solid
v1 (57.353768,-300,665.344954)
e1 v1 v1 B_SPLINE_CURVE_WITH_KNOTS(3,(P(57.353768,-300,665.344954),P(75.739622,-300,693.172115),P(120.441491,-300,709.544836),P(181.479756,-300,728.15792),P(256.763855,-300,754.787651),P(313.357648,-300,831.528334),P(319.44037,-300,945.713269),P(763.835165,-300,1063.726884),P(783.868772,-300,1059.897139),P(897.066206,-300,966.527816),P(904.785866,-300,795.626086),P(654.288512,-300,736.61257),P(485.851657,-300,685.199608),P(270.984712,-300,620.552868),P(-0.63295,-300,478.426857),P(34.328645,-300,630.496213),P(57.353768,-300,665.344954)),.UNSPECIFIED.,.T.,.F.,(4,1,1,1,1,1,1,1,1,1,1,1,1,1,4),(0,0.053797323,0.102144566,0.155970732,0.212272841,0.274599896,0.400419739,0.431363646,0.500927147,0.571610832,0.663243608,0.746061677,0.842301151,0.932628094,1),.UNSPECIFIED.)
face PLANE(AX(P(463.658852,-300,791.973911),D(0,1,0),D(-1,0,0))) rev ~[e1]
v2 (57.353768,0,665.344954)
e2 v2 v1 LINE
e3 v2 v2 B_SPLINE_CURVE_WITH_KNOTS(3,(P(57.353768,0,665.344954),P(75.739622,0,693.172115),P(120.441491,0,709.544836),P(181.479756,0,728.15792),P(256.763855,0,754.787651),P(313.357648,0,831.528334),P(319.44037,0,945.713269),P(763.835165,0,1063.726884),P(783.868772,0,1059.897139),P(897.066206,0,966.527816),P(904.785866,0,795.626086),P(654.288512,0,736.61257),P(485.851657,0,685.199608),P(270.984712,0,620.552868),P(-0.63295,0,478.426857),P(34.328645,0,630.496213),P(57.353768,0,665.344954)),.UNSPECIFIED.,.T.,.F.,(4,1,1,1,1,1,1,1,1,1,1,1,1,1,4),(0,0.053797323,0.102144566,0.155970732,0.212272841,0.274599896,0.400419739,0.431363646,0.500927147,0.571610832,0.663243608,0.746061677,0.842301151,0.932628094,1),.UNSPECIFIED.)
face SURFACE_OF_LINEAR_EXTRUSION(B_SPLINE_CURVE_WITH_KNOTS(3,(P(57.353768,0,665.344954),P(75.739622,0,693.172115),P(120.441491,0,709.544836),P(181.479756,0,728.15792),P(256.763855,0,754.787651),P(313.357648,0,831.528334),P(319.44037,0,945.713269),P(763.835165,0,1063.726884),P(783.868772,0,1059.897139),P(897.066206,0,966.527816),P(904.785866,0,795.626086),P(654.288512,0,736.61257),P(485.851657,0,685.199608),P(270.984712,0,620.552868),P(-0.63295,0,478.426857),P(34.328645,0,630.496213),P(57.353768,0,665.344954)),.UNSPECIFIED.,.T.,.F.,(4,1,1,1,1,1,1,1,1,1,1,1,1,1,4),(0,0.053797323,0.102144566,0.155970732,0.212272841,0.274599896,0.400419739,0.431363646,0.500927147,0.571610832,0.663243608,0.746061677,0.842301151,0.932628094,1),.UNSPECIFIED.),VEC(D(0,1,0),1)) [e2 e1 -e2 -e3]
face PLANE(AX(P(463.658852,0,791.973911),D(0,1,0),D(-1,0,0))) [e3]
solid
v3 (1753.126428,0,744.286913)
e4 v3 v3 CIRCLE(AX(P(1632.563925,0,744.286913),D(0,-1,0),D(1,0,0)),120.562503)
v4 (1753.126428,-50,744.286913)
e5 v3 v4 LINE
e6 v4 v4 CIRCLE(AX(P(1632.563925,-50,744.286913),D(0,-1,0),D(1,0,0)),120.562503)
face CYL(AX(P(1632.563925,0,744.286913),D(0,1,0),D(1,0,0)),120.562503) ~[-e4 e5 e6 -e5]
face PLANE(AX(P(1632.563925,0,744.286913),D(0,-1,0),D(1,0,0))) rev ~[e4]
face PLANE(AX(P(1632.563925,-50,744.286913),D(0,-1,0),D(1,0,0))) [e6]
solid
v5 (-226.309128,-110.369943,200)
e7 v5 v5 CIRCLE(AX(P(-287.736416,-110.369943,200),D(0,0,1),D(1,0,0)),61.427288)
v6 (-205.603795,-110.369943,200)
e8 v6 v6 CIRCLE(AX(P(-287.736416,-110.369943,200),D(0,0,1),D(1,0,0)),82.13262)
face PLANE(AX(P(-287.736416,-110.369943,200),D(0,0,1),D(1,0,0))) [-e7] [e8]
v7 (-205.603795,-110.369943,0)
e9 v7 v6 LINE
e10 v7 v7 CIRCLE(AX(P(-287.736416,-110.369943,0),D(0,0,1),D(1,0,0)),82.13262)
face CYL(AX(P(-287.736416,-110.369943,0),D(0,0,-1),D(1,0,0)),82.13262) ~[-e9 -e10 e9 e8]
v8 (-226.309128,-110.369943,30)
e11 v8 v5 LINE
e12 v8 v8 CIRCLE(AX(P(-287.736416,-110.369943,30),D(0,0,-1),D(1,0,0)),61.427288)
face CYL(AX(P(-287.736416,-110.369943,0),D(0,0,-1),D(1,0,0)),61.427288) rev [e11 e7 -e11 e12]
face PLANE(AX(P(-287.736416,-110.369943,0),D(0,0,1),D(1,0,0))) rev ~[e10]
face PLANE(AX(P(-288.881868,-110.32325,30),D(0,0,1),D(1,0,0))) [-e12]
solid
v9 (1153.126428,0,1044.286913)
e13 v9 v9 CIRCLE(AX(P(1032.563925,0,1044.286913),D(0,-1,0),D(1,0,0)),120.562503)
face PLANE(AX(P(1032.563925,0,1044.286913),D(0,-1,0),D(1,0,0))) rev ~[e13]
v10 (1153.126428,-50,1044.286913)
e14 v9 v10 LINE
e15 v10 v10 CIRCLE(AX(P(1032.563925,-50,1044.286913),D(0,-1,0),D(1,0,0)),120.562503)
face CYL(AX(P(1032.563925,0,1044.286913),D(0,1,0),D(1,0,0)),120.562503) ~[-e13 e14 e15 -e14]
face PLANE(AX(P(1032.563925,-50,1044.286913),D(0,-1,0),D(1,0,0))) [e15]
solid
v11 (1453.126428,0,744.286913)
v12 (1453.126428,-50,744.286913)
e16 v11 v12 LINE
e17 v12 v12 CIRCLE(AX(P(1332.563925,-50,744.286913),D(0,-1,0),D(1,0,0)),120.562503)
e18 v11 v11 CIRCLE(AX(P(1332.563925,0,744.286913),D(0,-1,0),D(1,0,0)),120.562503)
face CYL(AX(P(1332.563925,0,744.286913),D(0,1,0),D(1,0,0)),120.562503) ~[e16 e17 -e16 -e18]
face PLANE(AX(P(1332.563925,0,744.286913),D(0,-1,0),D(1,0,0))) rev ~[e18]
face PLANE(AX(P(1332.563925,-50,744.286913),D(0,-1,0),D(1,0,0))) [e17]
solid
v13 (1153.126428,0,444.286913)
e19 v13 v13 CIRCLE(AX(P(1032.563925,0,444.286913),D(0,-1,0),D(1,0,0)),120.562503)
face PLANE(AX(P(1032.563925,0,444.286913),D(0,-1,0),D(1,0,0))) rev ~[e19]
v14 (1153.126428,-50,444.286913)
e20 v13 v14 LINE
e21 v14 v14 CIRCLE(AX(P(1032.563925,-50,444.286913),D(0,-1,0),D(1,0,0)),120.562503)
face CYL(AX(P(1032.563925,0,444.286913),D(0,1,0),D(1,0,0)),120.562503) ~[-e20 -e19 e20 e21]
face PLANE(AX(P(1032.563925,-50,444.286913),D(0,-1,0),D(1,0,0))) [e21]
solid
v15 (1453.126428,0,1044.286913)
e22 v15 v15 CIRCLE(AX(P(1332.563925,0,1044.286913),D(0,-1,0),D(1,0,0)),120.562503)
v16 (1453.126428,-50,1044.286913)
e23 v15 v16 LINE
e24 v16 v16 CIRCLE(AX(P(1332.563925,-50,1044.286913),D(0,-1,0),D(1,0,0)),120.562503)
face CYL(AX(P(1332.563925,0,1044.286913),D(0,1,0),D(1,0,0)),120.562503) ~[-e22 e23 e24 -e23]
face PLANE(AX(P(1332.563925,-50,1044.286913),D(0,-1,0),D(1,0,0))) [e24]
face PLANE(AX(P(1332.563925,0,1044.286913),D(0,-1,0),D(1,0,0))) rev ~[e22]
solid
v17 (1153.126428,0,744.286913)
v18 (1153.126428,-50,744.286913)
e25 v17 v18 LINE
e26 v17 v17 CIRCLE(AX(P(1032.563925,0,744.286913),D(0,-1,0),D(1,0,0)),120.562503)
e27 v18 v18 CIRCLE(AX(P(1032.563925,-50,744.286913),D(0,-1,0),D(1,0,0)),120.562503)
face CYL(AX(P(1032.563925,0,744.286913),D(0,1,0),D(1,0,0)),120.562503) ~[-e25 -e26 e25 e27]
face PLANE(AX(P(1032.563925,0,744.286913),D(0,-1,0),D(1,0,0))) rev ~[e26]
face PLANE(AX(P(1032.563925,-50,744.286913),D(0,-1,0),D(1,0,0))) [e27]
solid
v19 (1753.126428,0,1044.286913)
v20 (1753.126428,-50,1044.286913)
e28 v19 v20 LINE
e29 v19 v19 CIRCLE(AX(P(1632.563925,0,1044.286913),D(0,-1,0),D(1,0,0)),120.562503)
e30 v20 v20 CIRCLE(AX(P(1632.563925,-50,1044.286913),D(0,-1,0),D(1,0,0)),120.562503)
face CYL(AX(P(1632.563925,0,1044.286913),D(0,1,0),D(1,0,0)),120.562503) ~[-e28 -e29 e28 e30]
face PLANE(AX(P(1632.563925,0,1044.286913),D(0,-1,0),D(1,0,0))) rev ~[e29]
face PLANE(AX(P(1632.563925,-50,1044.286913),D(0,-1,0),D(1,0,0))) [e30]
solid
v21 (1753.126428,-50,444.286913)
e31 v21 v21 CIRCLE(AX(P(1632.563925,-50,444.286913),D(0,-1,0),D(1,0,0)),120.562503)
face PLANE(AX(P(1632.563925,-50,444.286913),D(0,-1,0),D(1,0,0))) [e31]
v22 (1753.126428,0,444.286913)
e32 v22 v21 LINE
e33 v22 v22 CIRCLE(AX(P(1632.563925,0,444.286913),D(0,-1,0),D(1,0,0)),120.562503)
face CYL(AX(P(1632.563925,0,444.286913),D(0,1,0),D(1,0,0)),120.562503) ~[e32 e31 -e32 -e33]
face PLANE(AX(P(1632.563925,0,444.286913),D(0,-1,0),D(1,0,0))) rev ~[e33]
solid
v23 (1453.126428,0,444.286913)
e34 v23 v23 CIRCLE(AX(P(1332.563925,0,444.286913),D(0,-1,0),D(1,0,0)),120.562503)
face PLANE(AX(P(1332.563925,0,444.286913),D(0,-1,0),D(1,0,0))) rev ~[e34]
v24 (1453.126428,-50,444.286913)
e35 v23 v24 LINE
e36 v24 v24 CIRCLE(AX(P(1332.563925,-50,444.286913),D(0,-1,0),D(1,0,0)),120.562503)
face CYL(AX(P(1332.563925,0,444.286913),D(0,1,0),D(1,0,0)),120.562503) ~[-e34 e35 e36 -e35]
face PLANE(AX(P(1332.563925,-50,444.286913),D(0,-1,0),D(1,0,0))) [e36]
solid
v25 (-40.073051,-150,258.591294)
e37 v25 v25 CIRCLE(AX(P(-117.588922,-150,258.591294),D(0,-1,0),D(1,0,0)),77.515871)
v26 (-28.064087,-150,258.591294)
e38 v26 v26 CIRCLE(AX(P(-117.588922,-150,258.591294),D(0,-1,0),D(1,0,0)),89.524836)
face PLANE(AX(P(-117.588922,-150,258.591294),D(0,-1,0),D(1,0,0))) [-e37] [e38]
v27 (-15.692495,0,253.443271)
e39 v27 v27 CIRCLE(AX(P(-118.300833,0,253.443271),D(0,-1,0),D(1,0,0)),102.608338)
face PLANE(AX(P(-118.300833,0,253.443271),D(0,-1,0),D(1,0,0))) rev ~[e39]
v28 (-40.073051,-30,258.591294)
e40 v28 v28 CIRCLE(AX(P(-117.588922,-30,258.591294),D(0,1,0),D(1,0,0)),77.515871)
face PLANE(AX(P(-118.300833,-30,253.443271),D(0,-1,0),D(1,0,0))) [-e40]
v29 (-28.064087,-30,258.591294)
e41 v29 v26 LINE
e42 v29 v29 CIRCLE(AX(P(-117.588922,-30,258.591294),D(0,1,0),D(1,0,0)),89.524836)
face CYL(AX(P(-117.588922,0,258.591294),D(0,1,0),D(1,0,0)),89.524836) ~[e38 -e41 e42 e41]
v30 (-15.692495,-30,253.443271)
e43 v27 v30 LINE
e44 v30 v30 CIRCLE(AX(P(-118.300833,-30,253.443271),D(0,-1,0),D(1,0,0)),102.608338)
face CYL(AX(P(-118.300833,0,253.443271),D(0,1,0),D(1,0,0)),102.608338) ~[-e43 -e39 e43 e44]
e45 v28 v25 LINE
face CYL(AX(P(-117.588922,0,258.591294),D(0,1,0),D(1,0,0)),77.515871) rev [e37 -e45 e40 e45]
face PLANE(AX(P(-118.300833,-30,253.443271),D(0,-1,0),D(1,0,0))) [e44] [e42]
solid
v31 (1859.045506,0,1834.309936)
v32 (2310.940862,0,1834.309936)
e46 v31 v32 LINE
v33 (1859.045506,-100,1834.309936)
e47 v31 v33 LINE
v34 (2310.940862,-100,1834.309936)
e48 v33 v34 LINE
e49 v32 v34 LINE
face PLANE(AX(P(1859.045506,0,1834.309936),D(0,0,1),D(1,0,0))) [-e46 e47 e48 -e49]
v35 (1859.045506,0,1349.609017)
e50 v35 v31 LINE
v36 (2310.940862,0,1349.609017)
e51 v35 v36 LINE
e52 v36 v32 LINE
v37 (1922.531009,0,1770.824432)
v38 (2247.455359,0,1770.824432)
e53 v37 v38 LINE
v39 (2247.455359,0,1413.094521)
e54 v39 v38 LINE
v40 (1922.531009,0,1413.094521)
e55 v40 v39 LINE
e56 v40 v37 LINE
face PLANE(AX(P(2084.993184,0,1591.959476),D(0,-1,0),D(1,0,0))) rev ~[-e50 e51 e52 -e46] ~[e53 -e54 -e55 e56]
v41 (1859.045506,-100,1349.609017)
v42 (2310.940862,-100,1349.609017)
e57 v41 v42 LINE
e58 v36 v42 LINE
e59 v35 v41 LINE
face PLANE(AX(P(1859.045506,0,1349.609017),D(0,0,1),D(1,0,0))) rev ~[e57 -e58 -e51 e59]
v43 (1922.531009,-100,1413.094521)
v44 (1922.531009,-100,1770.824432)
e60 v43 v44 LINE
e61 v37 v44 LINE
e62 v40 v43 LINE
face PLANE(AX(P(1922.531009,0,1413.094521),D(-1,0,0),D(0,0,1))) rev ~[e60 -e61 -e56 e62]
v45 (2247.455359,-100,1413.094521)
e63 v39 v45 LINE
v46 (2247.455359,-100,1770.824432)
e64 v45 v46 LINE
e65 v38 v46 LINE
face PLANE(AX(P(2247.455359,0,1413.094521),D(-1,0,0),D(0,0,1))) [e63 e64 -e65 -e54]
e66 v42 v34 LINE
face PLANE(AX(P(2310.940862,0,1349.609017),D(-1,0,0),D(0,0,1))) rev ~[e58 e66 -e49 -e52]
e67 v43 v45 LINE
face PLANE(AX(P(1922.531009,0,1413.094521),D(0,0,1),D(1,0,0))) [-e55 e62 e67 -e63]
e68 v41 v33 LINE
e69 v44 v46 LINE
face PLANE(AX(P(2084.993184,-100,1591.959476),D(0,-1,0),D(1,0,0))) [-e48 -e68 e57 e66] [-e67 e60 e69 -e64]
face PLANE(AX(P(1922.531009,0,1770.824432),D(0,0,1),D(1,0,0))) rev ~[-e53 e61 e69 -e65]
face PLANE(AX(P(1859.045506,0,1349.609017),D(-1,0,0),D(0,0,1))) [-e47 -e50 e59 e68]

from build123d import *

# Parameters (mm, degrees)
F0_R      = 82.1326203769
F0_R_2    = 61.4272879331
F1_DEPTH  = 200
F2_R      = 71.5377696559
F3_DEPTH  = 30
F4_R      = 89.524835576
F4_R_2    = 77.5158713494
F5_DEPTH  = 150
F6_R      = 102.6083377999
F7_DEPTH  = 30
F9_DEPTH  = 300
F10_R     = 120.562503411
F11_DEPTH = 50
F12_W     = 451.8953561783
F12_H     = 484.7009181976
F12_W_2   = 324.9243497849
F12_H_2   = 357.7299118042
F13_DEPTH = 100


with BuildPart() as f1:
    # F0 (on Top) → F1 (new body)
    with BuildSketch(Plane.XY):
        with Locations((-287.736415863, -110.3699430823)):
            Circle(F0_R)
        with Locations((-287.736415863, -110.3699430823)):
            Circle(F0_R_2, mode=Mode.SUBTRACT)
    extrude(amount=F1_DEPTH)

    # F2 (on Top) → F3 (join)
    with BuildSketch(Plane.XY):
        with Locations((-288.881868124, -110.3232502937)):
            Circle(F2_R)
    extrude(amount=F3_DEPTH)


with BuildPart() as f5:
    # F4 (on Front) → F5 (new body)
    with BuildSketch(Plane.XZ):
        with Locations((-117.5889223814, 258.5912942886)):
            Circle(F4_R)
        with Locations((-117.5889223814, 258.5912942886)):
            Circle(F4_R_2, mode=Mode.SUBTRACT)
    extrude(amount=F5_DEPTH)

    # F6 (on Front) → F7 (join)
    with BuildSketch(Plane.XZ):
        with Locations((-118.300832808, 253.4432709217)):
            Circle(F6_R)
    extrude(amount=F7_DEPTH)


with BuildPart() as f9:
    # F8 (on Front) → F9 (new body)
    with BuildSketch(Plane.XZ):
        with BuildLine():
            add(Edge.make_bspline(
                [(57.3537684977, 665.344953537), (75.7396222507, 693.1721150366), (120.441491181, 709.5448357572), (181.4797555431, 728.1579200138), (256.7638546749, 754.7876508309), (313.3576484638, 831.5283338475), (319.4403702514, 945.7132685504), (763.8351652874, 1063.7268843019), (783.8687718693, 1059.89713934), (897.0662056264, 966.5278160698), (904.7858656689, 795.6260859729), (654.2885118019, 736.6125697023), (485.8516571578, 685.1996083758), (270.9847120753, 620.5528684155), (-0.632949876, 478.4268568096), (34.3286446619, 630.4962134058), (57.3537684977, 665.344953537)],
                knots=[0, 0, 0, 0, 0.0537973226, 0.1021445662, 0.1559707325, 0.2122728407, 0.2745998963, 0.4004197393, 0.4313636464, 0.5009271471, 0.5716108321, 0.6632436084, 0.7460616771, 0.842301151, 0.9326280938, 1, 1, 1, 1], degree=3))
        make_face()
    extrude(amount=F9_DEPTH)


with BuildPart() as f11:
    # F10 (on Front) → F11 (new body)
    with BuildSketch(Plane.XZ):
        with Locations((1032.5639247894, 444.2869126797)):
            Circle(F10_R)
    extrude(amount=F11_DEPTH)


with BuildPart() as f11b:
    # F10 (on Front) → F11, piece 2 (new body)
    with BuildSketch(Plane.XZ):
        with Locations((1032.5639247894, 744.2869126797)):
            Circle(F10_R)
    extrude(amount=F11_DEPTH)


with BuildPart() as f11c:
    # F10 (on Front) → F11, piece 3 (new body)
    with BuildSketch(Plane.XZ):
        with Locations((1032.5639247894, 1044.2869126797)):
            Circle(F10_R)
    extrude(amount=F11_DEPTH)


with BuildPart() as f11d:
    # F10 (on Front) → F11, piece 4 (new body)
    with BuildSketch(Plane.XZ):
        with Locations((1332.5639247894, 444.2869126797)):
            Circle(F10_R)
    extrude(amount=F11_DEPTH)


with BuildPart() as f11e:
    # F10 (on Front) → F11, piece 5 (new body)
    with BuildSketch(Plane.XZ):
        with Locations((1332.5639247894, 744.2869126797)):
            Circle(F10_R)
    extrude(amount=F11_DEPTH)


with BuildPart() as f11f:
    # F10 (on Front) → F11, piece 6 (new body)
    with BuildSketch(Plane.XZ):
        with Locations((1332.5639247894, 1044.2869126797)):
            Circle(F10_R)
    extrude(amount=F11_DEPTH)


with BuildPart() as f11g:
    # F10 (on Front) → F11, piece 7 (new body)
    with BuildSketch(Plane.XZ):
        with Locations((1632.5639247894, 444.2869126797)):
            Circle(F10_R)
    extrude(amount=F11_DEPTH)


with BuildPart() as f11h:
    # F10 (on Front) → F11, piece 8 (new body)
    with BuildSketch(Plane.XZ):
        with Locations((1632.5639247894, 744.2869126797)):
            Circle(F10_R)
    extrude(amount=F11_DEPTH)


with BuildPart() as f11i:
    # F10 (on Front) → F11, piece 9 (new body)
    with BuildSketch(Plane.XZ):
        with Locations((1632.5639247894, 1044.2869126797)):
            Circle(F10_R)
    extrude(amount=F11_DEPTH)


with BuildPart() as f13:
    # F12 (on Front) → F13 (new body)
    with BuildSketch(Plane.XZ):
        with Locations((2084.9931836128, 1591.9594764709)):
            Rectangle(F12_W, F12_H)
        with Locations((2084.9931836128, 1591.9594764709)):
            Rectangle(F12_W_2, F12_H_2, mode=Mode.SUBTRACT)
    extrude(amount=F13_DEPTH)


solid = Compound([f1.part, f5.part, f9.part, f11.part, f11b.part, f11c.part, f11d.part, f11e.part, f11f.part, f11g.part, f11h.part, f11i.part, f13.part])
